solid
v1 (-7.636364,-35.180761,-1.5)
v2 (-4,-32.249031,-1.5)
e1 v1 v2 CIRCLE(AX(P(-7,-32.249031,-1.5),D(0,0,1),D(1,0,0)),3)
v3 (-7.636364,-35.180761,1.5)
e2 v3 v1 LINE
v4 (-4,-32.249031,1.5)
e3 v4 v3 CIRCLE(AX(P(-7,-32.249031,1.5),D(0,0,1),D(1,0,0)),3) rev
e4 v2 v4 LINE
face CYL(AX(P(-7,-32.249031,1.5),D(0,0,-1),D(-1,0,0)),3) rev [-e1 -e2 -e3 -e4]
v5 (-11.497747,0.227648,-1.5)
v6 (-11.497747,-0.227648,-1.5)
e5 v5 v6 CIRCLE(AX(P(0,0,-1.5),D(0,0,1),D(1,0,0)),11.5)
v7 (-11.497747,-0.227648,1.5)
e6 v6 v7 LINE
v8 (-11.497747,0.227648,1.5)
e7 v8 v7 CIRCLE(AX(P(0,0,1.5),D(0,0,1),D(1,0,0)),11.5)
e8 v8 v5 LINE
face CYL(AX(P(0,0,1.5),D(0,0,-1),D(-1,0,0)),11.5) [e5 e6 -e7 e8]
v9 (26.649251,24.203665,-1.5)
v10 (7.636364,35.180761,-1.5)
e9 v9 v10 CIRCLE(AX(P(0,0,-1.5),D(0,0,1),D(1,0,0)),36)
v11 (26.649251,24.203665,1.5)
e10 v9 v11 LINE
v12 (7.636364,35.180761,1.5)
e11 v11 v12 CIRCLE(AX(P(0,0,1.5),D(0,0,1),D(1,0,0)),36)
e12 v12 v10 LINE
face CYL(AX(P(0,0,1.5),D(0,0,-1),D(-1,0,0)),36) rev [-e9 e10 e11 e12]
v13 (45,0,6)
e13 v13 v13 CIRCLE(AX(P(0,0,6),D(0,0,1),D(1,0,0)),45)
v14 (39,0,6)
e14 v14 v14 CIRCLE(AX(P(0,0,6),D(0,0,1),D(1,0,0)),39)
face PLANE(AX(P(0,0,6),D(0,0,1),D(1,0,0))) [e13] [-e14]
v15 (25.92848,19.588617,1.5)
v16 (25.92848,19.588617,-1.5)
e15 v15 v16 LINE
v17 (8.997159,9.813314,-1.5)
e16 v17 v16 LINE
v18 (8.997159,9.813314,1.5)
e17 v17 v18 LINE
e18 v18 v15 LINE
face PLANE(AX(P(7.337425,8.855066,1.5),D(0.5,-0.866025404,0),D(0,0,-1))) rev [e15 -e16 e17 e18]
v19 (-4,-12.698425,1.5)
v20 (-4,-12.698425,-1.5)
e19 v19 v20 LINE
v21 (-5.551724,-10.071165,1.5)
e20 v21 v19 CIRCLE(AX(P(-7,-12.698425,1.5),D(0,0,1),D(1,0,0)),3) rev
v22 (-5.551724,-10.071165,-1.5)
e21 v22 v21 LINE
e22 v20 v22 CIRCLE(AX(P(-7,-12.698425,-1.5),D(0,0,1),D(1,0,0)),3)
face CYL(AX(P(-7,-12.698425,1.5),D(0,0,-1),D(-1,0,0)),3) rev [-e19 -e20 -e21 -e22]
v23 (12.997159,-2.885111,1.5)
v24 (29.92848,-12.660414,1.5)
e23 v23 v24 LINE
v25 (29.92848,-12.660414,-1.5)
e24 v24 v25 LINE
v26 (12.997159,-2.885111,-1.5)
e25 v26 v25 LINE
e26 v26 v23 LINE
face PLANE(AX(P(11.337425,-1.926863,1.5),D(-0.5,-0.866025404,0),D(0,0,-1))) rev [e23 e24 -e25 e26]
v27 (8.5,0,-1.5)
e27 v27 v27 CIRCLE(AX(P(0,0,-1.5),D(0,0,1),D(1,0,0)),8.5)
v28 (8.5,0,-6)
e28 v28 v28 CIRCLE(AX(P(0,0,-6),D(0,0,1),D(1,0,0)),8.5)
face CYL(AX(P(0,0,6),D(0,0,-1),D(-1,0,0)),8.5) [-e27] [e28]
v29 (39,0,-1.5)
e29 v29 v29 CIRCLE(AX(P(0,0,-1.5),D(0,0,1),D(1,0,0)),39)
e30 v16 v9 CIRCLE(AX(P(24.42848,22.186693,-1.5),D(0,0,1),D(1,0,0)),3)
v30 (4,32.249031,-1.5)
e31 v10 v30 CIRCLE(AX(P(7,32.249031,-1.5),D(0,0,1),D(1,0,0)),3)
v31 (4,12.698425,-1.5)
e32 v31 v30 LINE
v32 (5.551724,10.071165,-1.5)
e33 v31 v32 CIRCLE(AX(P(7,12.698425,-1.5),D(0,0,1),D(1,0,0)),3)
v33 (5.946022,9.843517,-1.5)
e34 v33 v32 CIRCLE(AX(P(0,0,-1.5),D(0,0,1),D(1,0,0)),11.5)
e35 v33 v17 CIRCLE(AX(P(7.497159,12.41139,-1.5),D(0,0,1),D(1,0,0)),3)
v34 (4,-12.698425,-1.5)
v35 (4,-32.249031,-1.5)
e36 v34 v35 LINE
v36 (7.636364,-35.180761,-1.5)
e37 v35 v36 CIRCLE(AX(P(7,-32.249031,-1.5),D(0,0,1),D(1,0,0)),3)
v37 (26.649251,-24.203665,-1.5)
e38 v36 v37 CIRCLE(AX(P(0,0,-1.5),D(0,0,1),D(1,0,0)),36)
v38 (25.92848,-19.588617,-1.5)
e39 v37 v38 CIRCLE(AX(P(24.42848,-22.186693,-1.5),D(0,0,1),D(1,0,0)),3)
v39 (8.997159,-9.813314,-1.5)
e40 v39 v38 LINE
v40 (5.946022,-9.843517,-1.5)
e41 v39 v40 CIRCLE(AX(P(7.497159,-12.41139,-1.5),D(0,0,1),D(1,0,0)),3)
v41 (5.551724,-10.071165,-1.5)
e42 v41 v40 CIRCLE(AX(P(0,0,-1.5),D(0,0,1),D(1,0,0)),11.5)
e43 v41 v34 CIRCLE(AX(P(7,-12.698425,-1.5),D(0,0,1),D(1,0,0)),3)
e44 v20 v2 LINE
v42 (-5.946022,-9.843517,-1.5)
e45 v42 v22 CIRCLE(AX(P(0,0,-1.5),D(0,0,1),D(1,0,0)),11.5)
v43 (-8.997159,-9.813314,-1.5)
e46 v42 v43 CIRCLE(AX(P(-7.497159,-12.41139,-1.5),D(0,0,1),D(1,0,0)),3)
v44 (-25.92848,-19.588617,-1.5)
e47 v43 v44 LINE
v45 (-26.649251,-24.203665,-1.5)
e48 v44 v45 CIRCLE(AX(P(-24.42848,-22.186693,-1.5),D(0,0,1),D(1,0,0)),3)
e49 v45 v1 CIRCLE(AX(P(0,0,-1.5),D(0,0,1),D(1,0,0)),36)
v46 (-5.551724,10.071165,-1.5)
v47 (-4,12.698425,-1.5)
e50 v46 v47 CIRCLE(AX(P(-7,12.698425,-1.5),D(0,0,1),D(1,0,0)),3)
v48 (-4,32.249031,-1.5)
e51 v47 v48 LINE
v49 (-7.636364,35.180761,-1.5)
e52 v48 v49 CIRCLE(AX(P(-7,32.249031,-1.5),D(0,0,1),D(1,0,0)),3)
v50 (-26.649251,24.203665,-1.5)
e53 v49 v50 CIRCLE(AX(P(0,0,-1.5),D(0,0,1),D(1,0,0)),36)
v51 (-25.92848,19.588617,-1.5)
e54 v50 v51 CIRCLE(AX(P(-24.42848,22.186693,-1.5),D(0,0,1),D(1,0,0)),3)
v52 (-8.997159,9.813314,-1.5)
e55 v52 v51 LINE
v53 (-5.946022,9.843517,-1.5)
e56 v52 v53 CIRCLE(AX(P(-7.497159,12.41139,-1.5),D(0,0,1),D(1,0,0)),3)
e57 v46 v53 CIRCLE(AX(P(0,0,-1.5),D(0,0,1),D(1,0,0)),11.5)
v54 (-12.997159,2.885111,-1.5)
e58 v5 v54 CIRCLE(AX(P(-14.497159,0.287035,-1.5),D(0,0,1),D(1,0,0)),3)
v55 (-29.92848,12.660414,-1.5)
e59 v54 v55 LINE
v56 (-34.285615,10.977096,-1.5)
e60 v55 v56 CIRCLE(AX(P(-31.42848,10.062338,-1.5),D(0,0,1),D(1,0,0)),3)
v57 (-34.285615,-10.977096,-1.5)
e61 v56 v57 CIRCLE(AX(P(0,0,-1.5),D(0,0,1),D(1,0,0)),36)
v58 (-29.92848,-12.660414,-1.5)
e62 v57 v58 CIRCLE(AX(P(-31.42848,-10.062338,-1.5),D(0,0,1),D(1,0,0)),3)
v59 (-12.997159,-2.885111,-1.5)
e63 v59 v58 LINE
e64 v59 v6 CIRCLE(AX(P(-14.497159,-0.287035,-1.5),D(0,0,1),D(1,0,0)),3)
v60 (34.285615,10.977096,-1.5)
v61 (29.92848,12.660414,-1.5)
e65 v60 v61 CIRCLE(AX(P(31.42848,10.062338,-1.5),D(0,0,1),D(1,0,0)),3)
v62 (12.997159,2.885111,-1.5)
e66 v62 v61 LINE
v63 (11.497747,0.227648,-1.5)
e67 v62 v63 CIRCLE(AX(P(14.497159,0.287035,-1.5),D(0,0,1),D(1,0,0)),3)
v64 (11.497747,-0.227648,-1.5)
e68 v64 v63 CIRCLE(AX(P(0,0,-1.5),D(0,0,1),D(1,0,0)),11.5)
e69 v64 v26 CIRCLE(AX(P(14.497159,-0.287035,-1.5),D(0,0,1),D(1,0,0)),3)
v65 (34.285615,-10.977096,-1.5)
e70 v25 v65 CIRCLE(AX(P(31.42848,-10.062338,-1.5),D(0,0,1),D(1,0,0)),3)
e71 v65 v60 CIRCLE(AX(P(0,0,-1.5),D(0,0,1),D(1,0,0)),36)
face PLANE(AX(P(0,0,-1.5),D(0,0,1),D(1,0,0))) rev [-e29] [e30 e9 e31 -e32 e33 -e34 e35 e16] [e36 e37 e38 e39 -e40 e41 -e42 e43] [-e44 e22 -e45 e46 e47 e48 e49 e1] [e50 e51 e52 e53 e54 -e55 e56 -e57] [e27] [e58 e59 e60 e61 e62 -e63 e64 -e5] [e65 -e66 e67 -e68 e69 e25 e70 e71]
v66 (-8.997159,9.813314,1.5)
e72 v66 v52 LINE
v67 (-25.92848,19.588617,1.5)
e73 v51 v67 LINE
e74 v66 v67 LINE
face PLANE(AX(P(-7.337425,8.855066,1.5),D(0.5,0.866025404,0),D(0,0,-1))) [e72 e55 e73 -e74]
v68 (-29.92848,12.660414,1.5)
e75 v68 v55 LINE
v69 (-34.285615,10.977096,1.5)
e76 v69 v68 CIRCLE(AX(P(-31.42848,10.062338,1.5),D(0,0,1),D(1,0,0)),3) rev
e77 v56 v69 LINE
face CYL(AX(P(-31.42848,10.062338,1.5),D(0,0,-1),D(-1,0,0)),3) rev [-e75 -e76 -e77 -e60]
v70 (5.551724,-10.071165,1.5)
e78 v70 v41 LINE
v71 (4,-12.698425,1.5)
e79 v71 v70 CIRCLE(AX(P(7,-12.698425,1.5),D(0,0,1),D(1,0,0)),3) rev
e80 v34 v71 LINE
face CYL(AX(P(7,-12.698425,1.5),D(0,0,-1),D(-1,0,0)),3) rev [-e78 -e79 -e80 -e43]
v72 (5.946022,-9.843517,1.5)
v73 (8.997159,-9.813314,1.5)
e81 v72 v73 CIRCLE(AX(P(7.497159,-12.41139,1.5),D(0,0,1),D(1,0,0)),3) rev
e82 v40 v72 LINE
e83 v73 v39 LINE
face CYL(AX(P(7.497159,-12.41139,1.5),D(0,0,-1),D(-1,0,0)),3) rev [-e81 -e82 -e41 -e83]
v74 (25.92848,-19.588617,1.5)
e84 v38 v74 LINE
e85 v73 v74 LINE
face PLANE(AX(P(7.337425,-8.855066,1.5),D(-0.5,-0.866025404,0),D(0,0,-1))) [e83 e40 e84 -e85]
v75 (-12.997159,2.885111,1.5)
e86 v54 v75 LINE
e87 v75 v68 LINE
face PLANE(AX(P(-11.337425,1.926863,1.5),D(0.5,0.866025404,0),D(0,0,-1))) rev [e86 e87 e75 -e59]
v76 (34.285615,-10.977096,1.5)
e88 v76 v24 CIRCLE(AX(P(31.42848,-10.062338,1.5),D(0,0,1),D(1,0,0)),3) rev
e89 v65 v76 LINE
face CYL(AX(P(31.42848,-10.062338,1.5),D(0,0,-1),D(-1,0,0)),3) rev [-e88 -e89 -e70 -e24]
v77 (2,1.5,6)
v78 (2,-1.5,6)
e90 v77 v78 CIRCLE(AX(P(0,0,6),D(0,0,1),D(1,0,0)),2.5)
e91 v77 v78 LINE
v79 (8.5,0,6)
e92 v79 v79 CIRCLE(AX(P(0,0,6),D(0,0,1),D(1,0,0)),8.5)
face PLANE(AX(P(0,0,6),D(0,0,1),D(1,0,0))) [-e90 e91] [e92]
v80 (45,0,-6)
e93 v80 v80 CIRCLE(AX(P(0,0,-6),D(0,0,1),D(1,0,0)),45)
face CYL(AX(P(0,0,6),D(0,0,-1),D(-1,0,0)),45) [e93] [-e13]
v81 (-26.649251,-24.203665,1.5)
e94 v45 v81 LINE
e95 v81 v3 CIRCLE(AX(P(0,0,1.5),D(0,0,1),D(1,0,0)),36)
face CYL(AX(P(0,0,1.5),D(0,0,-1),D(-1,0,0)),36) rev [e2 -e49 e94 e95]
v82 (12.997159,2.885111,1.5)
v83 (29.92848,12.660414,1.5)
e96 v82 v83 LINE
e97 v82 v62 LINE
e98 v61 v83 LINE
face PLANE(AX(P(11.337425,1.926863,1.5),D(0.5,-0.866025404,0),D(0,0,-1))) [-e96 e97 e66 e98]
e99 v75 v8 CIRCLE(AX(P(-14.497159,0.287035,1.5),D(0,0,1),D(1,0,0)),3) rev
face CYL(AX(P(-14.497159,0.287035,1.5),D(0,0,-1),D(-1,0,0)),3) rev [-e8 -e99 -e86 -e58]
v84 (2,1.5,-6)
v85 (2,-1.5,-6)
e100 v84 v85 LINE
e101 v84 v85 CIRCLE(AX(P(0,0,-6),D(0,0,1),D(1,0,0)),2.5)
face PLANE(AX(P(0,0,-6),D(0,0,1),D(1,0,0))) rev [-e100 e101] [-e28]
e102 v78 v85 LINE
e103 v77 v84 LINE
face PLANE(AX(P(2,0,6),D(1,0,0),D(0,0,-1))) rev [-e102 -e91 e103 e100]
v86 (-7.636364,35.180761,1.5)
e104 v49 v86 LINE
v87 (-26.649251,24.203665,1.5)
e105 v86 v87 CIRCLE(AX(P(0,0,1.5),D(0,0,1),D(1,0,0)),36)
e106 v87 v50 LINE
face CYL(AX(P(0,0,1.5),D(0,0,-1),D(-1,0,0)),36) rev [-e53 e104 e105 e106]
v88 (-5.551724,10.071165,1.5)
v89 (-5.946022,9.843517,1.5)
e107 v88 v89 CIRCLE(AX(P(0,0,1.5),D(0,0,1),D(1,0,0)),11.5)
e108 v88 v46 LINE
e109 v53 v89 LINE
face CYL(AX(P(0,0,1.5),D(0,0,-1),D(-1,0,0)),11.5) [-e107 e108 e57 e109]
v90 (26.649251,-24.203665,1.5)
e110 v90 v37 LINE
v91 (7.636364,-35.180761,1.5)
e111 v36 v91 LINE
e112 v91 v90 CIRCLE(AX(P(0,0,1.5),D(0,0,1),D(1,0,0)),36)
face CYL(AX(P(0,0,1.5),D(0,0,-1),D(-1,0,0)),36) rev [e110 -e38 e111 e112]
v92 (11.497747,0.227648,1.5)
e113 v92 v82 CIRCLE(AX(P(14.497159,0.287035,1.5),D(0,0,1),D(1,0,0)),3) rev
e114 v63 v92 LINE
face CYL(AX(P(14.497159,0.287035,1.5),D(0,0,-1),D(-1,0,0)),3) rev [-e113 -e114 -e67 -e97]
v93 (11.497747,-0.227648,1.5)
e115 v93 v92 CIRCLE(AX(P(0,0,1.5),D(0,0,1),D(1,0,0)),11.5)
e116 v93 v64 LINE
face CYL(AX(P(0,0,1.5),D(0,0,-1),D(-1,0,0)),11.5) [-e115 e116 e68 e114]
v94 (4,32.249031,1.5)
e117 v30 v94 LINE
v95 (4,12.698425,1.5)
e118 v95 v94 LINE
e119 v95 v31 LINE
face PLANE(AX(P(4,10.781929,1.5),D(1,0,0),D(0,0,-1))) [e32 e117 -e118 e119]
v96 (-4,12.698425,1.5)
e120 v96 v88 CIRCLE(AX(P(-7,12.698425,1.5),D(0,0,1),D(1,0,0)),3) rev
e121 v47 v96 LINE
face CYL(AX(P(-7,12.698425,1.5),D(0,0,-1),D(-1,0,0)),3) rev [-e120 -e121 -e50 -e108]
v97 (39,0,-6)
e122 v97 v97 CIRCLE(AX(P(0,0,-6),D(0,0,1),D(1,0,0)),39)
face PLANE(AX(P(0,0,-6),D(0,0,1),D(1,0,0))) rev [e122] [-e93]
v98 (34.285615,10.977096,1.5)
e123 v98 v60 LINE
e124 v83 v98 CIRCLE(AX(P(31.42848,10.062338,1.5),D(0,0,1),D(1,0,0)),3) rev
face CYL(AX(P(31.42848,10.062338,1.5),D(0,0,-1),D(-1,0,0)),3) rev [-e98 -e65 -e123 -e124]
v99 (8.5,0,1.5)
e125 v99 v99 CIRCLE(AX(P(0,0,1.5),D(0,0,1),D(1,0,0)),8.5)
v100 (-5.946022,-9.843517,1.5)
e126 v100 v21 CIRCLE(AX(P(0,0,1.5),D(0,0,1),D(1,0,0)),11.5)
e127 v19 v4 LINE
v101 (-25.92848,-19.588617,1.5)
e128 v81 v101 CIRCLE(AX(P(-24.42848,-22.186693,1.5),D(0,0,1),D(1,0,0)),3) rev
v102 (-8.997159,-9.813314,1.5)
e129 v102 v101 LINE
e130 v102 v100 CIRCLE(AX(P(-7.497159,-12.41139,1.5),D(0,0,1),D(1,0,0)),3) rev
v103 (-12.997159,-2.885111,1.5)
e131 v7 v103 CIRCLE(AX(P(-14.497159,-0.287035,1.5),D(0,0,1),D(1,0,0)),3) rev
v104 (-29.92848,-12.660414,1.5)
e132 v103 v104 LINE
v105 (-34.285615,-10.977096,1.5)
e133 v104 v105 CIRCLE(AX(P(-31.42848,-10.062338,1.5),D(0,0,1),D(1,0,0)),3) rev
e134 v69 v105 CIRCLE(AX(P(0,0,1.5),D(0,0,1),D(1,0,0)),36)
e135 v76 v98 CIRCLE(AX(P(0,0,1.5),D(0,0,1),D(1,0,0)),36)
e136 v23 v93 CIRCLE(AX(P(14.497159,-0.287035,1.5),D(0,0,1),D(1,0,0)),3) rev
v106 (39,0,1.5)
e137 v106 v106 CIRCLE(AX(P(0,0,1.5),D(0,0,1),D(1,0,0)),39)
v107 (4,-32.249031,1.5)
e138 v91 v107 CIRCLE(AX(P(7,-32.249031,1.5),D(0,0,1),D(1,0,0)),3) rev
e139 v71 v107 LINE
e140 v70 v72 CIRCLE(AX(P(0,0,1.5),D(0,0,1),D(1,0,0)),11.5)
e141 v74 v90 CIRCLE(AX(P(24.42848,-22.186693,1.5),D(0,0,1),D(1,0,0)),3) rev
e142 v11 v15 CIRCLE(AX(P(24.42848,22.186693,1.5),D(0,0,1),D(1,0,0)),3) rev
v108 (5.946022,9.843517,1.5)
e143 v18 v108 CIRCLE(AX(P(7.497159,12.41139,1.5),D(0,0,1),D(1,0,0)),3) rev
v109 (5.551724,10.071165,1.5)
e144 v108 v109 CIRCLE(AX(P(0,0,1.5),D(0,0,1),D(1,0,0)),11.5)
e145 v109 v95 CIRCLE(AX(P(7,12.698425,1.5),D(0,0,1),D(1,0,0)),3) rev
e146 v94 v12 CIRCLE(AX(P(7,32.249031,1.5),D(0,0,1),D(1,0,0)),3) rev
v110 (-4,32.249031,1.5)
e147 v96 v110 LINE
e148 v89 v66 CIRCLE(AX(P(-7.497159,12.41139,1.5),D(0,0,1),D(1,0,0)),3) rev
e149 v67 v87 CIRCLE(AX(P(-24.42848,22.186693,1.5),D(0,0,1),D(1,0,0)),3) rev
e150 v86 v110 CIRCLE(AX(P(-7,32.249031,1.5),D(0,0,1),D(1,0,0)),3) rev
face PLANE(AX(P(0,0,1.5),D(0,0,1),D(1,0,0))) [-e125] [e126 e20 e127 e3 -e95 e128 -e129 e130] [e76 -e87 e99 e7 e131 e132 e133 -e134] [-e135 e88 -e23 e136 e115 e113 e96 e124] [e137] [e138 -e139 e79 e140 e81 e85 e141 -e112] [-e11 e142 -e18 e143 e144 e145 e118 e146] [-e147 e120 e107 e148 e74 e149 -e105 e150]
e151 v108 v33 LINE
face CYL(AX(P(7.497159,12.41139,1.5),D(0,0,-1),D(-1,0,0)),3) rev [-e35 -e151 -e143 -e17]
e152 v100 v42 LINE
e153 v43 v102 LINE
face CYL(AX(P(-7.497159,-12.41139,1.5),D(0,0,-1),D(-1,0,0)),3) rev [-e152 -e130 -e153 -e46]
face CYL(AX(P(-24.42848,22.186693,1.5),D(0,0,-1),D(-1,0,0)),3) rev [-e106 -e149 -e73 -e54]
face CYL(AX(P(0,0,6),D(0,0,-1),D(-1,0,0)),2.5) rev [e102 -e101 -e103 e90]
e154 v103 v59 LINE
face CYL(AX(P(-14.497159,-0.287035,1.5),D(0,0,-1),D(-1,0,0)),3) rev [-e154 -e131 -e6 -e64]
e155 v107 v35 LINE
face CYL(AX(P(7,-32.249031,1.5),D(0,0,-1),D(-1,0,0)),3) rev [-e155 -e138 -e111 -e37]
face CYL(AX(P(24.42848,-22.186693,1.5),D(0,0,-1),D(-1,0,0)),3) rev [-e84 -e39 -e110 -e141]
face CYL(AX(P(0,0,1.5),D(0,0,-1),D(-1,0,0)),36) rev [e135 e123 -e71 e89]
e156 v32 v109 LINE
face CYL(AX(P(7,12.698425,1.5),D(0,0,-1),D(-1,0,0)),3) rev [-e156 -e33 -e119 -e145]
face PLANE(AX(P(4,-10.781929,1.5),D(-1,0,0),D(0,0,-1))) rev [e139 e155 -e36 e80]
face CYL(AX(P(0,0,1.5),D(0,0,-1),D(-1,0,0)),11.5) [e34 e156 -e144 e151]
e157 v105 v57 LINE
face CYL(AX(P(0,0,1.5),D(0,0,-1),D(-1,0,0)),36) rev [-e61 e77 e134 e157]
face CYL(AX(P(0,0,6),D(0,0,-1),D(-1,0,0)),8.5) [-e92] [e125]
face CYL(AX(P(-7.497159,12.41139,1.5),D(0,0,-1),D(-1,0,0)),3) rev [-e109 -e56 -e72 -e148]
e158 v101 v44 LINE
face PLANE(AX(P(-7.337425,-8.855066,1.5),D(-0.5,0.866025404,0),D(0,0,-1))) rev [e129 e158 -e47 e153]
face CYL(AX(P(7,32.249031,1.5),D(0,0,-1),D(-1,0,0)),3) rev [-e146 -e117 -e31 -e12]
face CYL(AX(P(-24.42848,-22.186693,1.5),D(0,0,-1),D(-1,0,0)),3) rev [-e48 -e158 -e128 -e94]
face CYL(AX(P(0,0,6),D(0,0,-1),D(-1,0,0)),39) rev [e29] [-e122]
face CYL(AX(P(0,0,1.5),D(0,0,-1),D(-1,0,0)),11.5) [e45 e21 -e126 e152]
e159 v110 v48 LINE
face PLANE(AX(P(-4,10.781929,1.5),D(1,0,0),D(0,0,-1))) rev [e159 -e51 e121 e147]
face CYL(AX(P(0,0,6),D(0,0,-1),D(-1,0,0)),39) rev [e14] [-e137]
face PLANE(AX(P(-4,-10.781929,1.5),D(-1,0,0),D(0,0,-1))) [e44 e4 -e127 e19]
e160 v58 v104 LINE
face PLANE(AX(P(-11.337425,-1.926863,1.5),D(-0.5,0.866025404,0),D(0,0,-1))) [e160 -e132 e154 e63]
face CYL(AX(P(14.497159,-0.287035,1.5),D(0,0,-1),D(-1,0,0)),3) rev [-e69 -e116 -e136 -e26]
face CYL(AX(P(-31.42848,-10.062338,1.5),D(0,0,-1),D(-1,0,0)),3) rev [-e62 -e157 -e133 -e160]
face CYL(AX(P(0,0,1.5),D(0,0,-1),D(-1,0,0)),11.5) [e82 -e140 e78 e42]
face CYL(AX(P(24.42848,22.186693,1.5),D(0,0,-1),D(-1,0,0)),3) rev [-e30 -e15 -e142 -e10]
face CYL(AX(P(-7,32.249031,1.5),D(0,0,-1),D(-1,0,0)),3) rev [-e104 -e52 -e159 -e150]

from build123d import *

# Parameters (mm, degrees)
SKETCH1_R             = 45
SKETCH1_R_2           = 39
BOSS_EXTRUDE1_DEPTH   = 6
SKETCH1_R_3           = 8.5
BOSS_EXTRUDE1_2_DEPTH = 6
SKETCH4_R             = 39
SKETCH4_R_2           = 36
SKETCH4_R_3           = 11.5
SKETCH4_R_4           = 8.5
BOSS_EXTRUDE3_DEPTH   = 1.5
BOSS_EXTRUDE2_START   = -1.5
BOSS_EXTRUDE2_DEPTH   = 3
CIRPATTERN6_COUNT     = 6
FILLET1_R             = 3


# Read off the part's stored shape, not the designer's step: Boss-Extrude2
with BuildPart() as part:
    # Sketch1 → Boss-Extrude1 (new, symmetric)
    with BuildSketch(Plane.XY):
        Circle(SKETCH1_R)
        Circle(SKETCH1_R_2, mode=Mode.SUBTRACT)
    extrude(amount=BOSS_EXTRUDE1_DEPTH, both=True)



with BuildPart() as body_2:
    # Sketch1 → Boss-Extrude1 2 (new, symmetric)
    with BuildSketch(Plane.XY):
        Circle(SKETCH1_R_3)
        with BuildLine():
            Line((2, 1.5), (2, -1.5))
            ThreePointArc((2, -1.5), (-2.5, 0), (2, 1.5))
        make_face(mode=Mode.SUBTRACT)
    extrude(amount=BOSS_EXTRUDE1_2_DEPTH, both=True)


with BuildPart() as part_1:
    add(part.part)

    add(body_2.part)  # Boss-Extrude3 merges body 2
    # Sketch4 → Boss-Extrude3 (add, symmetric)
    # profile 1 of 2: a face of its own
    with BuildSketch(Plane.XY):
        Circle(SKETCH4_R)
        Circle(SKETCH4_R_2, mode=Mode.SUBTRACT)
    # profile 2 of 2: a face of its own
    with BuildSketch(Plane.XY):
        Circle(SKETCH4_R_3)
        Circle(SKETCH4_R_4, mode=Mode.SUBTRACT)
    extrude(amount=BOSS_EXTRUDE3_DEPTH, both=True)


with BuildPart() as body_2_2:
    # Boss-Extrude2 outline → Boss-Extrude2 (new body)
    with BuildSketch(Plane.XY.offset(BOSS_EXTRUDE2_START)):
        with BuildLine():
            Line((-4, 35.77708764), (-4, 10.781929326))
            ThreePointArc((-4, 10.781929326), (0, 11.5), (4, 10.781929326))
            Line((4, 10.781929326), (4, 35.77708764))
            ThreePointArc((4, 35.77708764), (0, 36), (-4, 35.77708764))
        make_face()
    extrude(amount=BOSS_EXTRUDE2_DEPTH)


with BuildPart() as cirpattern6_1:
    # CirPattern6: pattern copy
    add(body_2_2.part.rotate(Axis((0, 0, 0), (0, 0, 1)), 1 * 360 / CIRPATTERN6_COUNT))


with BuildPart() as cirpattern6_2:
    # CirPattern6: pattern copy
    add(body_2_2.part.rotate(Axis((0, 0, 0), (0, 0, 1)), 2 * 360 / CIRPATTERN6_COUNT))


with BuildPart() as cirpattern6_3:
    # CirPattern6: pattern copy
    add(body_2_2.part.rotate(Axis((0, 0, 0), (0, 0, 1)), 3 * 360 / CIRPATTERN6_COUNT))


with BuildPart() as cirpattern6_4:
    # CirPattern6: pattern copy
    add(body_2_2.part.rotate(Axis((0, 0, 0), (0, 0, 1)), 4 * 360 / CIRPATTERN6_COUNT))


with BuildPart() as cirpattern6_5:
    # CirPattern6: pattern copy
    add(body_2_2.part.rotate(Axis((0, 0, 0), (0, 0, 1)), 5 * 360 / CIRPATTERN6_COUNT))


with BuildPart() as part_2:
    add(part_1.part)

    # Combine1: union body 2 2, CirPattern6_5, CirPattern6_4, CirPattern6_3, CirPattern6_2, CirPattern6_1
    add(body_2_2.part)
    add(cirpattern6_5.part)
    add(cirpattern6_4.part)
    add(cirpattern6_3.part)
    add(cirpattern6_2.part)
    add(cirpattern6_1.part)

    # Fillet1
    fillet1_edges = [part_2.edges().sort_by_distance(p)[0] for p in [
        (-4, 10.781929326, 0),
        (-11.337424698, 1.926863048, 0),
        (-7.337424698, -8.855066278, 0),
        (4, -10.781929326, 0),
        (11.337424698, -1.926863048, 0),
        (7.337424698, 8.855066278, 0),
        (-4, 35.77708764, 0),
        (4, 10.781929326, 0),
        (4, 35.77708764, 0),
        (28.98386677, 21.352645435, 0),
        (11.337424698, 1.926863048, 0),
        (32.98386677, 14.424442205, 0),
        (32.98386677, -14.424442205, 0),
        (7.337424698, -8.855066278, 0),
        (28.98386677, -21.352645435, 0),
        (4, -35.77708764, 0),
        (-4, -10.781929326, 0),
        (-4, -35.77708764, 0),
        (-28.98386677, -21.352645435, 0),
        (-11.337424698, -1.926863048, 0),
        (-32.98386677, -14.424442205, 0),
        (-32.98386677, 14.424442205, 0),
        (-7.337424698, 8.855066278, 0),
        (-28.98386677, 21.352645435, 0),
    ]]
    fillet(fillet1_edges, radius=FILLET1_R)


solid = part_2.part
